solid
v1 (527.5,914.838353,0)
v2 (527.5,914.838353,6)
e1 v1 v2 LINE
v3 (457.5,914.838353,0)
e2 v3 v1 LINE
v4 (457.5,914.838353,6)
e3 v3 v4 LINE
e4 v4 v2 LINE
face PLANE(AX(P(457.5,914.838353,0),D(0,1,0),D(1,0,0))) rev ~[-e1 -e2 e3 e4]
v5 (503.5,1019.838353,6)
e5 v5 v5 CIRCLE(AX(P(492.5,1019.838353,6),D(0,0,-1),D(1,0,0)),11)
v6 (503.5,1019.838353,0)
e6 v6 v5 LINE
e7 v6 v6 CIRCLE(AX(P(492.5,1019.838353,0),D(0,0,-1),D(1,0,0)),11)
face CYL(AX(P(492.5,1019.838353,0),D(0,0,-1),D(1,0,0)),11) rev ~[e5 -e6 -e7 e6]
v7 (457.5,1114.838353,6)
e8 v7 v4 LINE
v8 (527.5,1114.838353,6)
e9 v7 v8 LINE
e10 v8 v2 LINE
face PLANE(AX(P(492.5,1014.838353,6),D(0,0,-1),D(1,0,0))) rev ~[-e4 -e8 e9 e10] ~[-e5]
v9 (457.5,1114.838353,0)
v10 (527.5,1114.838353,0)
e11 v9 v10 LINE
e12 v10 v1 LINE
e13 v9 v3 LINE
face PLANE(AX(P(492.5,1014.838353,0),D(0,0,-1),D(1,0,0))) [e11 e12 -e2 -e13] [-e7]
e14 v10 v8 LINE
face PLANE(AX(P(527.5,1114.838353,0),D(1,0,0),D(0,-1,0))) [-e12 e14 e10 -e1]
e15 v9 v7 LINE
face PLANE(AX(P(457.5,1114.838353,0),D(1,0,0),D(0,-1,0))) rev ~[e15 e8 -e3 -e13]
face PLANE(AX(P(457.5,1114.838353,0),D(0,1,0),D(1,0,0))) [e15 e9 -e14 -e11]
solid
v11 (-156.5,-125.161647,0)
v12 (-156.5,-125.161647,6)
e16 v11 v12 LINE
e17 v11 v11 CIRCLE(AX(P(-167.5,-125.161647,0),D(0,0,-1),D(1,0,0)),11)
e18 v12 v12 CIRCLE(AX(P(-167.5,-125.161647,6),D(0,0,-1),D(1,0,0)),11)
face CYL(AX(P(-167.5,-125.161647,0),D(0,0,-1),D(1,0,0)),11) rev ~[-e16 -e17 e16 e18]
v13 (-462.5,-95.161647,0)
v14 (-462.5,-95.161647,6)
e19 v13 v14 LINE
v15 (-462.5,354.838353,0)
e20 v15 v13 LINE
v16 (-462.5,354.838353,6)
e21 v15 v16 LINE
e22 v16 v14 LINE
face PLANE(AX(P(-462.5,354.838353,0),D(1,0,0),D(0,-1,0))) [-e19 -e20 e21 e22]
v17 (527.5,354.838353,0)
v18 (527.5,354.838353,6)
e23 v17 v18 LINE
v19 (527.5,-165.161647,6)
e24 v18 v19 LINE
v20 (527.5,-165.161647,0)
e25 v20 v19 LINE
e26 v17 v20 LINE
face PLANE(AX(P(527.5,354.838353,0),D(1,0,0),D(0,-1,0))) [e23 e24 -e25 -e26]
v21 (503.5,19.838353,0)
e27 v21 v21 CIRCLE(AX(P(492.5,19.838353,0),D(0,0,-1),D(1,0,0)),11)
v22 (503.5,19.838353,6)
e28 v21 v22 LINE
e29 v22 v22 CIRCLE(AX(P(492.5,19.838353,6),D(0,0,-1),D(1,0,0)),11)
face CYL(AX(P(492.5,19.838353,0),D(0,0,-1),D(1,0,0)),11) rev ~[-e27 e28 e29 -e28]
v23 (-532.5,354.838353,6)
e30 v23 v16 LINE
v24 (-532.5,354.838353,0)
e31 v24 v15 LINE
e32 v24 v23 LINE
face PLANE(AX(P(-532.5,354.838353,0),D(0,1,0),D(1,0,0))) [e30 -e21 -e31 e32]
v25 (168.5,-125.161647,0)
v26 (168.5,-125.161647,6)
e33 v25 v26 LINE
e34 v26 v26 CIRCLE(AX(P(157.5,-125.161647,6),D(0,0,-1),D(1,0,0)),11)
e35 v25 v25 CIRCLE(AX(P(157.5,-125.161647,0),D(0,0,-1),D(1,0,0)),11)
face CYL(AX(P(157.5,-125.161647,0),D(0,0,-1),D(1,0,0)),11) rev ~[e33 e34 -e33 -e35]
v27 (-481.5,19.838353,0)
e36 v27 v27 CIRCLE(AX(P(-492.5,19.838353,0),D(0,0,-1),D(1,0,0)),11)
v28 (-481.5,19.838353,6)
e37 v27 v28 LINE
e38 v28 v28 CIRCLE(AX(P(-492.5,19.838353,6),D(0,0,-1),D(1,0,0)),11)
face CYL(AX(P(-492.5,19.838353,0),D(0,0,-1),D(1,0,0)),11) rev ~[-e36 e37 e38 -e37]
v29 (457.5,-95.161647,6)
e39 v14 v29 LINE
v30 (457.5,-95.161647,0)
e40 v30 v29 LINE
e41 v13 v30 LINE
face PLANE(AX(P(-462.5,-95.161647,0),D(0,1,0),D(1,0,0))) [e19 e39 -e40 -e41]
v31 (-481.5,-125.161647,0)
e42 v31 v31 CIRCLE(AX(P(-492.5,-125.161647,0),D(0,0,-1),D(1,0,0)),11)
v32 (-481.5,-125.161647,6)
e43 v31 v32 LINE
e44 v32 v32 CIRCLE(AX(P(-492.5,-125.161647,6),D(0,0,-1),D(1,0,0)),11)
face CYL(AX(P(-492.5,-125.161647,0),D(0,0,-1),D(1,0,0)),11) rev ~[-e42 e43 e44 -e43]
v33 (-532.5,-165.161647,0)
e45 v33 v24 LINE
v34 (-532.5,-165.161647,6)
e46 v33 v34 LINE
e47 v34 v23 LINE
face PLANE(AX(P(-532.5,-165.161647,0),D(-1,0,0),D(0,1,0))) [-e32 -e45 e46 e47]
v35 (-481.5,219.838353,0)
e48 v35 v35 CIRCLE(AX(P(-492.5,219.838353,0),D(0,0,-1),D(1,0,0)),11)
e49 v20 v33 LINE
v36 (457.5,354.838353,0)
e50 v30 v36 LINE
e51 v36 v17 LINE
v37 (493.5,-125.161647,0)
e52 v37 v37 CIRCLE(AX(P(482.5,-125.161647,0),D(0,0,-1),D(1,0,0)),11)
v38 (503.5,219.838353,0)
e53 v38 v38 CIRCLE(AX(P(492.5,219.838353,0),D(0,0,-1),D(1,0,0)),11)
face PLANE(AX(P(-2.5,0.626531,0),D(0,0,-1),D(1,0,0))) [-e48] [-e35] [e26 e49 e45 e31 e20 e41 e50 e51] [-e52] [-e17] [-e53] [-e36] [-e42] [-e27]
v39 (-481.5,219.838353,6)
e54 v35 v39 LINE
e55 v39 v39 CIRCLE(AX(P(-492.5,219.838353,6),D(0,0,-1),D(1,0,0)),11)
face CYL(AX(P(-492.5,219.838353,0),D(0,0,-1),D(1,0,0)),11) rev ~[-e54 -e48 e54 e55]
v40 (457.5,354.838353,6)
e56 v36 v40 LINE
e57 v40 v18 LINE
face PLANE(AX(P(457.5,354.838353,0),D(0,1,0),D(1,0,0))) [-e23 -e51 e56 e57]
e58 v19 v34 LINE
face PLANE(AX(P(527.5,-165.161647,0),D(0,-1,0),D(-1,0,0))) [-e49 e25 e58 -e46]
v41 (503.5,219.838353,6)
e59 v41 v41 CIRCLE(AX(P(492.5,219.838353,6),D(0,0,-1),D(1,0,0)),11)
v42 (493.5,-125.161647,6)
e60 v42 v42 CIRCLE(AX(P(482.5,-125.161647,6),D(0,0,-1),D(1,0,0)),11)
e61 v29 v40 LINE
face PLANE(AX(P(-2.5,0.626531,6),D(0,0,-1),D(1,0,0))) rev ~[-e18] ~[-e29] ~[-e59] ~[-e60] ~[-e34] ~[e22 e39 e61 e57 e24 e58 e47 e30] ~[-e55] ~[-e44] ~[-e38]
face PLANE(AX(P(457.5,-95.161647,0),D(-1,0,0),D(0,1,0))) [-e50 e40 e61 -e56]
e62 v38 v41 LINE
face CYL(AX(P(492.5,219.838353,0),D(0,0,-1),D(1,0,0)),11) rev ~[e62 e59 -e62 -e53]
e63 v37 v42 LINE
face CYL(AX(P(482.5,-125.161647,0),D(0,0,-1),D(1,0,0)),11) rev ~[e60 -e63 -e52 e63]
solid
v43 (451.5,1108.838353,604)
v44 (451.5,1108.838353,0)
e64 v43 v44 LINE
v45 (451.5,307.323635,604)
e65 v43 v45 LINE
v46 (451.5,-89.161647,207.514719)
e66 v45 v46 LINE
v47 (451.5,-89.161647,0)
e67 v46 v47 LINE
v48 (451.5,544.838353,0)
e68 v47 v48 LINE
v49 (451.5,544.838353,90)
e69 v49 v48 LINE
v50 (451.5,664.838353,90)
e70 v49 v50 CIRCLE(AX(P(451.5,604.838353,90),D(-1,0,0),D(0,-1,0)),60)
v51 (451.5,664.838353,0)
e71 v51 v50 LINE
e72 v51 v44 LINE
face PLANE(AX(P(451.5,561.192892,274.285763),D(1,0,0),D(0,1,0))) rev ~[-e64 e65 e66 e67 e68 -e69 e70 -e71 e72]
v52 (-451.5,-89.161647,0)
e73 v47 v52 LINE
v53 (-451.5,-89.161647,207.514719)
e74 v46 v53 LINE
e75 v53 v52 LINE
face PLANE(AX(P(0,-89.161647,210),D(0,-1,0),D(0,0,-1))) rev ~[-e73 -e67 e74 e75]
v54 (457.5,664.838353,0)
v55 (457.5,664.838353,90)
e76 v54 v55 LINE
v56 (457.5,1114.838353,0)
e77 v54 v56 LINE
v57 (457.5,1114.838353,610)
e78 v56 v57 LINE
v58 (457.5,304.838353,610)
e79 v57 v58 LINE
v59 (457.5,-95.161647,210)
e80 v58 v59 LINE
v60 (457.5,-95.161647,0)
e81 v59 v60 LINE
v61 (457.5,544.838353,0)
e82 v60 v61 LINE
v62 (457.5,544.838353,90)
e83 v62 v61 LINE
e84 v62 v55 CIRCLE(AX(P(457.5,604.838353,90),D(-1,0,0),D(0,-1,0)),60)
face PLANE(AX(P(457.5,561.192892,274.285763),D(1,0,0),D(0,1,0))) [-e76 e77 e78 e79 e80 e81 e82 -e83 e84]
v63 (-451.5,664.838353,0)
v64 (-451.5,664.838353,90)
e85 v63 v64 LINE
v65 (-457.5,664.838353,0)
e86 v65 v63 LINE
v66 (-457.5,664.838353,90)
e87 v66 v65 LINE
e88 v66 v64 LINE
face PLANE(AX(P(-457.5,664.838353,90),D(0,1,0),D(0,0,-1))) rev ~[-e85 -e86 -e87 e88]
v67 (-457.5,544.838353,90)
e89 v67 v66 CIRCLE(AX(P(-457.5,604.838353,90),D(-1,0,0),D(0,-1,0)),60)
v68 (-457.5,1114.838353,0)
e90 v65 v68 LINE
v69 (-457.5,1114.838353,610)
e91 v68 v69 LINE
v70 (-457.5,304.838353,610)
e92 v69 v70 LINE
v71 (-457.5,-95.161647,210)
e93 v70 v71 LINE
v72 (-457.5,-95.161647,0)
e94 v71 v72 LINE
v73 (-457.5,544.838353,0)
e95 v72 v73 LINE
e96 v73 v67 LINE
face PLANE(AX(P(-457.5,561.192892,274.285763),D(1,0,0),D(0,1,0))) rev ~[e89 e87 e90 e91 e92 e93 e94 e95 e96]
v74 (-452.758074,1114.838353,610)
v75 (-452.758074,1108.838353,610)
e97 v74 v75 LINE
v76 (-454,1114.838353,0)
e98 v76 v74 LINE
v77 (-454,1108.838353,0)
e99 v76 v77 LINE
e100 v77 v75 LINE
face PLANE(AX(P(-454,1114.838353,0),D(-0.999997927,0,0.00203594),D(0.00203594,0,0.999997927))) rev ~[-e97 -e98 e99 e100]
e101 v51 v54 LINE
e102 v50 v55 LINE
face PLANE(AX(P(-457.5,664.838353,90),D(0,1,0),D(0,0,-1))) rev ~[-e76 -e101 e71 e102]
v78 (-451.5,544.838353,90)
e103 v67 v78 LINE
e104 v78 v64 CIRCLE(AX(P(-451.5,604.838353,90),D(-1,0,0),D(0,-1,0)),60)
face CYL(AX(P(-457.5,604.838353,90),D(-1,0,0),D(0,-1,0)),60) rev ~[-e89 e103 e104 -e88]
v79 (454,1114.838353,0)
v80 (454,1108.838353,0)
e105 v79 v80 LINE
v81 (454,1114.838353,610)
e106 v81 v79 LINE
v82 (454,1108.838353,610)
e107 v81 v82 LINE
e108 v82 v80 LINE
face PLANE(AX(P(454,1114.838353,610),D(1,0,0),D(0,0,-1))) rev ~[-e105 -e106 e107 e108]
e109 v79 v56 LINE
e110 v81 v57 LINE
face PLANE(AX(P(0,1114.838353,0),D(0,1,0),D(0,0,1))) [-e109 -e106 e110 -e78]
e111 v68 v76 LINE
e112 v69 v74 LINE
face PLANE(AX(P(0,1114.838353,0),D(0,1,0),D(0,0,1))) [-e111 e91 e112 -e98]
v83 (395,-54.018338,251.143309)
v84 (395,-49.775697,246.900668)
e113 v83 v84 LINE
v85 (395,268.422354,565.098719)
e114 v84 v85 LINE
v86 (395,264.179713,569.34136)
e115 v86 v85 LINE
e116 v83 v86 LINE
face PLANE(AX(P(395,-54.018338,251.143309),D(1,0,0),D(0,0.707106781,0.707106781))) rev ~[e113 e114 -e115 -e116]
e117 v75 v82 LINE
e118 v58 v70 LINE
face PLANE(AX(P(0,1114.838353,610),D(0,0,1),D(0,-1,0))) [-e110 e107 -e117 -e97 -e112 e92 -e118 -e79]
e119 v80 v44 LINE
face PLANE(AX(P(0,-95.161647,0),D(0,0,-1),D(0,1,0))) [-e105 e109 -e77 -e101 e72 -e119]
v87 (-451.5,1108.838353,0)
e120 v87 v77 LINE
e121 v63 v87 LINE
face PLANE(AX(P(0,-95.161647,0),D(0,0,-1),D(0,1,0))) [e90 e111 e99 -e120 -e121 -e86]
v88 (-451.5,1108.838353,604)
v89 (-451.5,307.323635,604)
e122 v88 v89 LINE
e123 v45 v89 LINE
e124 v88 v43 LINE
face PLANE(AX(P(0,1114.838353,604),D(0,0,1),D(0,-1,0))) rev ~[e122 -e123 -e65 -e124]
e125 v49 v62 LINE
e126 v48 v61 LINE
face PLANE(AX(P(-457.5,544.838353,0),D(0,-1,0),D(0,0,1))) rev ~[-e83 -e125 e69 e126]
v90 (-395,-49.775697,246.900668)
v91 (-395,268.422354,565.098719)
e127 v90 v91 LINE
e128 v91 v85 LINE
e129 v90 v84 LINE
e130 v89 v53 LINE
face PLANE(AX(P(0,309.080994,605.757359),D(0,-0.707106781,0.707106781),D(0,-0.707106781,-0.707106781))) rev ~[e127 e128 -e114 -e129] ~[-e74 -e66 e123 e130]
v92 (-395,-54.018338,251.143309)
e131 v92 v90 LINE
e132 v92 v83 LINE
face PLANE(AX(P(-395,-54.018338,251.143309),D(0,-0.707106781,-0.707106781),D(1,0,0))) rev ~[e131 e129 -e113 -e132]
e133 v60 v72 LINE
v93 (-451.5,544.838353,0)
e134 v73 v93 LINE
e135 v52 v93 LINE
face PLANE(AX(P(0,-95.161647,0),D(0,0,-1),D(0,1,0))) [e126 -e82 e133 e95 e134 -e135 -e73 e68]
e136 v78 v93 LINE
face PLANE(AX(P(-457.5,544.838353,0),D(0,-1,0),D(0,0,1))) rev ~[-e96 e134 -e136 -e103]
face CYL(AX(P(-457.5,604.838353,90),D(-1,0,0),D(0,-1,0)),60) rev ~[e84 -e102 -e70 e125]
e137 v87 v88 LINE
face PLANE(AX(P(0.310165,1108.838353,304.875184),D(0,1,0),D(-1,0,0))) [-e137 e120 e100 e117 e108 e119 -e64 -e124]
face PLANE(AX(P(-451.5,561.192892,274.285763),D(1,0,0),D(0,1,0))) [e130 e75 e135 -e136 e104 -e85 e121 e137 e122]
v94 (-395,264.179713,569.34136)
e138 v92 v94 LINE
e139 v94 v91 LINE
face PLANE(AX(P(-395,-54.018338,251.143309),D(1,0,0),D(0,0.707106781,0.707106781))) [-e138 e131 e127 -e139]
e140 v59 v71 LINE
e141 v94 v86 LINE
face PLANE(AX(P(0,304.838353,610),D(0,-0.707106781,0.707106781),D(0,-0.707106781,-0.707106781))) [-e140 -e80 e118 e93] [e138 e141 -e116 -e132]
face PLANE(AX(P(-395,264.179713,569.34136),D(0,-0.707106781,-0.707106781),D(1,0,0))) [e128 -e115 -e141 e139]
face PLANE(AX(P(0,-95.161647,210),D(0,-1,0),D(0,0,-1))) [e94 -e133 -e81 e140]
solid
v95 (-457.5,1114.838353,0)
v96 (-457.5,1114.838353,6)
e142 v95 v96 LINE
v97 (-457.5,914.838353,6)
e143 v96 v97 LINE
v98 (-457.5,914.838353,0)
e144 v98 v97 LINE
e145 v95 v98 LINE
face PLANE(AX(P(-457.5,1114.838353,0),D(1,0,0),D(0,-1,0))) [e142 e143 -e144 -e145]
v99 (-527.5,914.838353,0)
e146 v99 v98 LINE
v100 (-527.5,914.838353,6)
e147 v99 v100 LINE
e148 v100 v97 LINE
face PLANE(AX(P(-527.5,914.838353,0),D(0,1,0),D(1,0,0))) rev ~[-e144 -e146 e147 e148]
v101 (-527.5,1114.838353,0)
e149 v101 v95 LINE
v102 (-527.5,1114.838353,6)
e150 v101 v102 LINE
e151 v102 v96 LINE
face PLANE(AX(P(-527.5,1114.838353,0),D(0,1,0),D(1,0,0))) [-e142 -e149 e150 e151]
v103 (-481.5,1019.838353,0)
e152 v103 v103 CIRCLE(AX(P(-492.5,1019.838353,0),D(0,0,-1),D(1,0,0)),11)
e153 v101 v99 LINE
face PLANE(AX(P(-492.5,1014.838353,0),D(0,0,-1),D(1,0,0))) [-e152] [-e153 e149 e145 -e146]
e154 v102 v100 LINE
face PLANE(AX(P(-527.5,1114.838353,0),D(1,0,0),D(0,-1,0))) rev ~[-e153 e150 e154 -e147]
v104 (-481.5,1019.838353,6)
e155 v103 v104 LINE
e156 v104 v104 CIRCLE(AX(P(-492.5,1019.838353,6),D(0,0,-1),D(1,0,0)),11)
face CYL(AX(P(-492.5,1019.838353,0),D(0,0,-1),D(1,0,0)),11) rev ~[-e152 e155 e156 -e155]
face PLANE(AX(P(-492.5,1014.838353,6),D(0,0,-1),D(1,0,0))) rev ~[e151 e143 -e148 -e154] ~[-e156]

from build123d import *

# Parameters (mm, degrees)
F1_DEPTH  = 457.5
F2_T      = -6
F4_DEPTH  = 6
F5_R      = 11
F6_DEPTH  = 6
F5_W      = 70
F5_H      = 200
F8_DEPTH  = 985.001
F9_W      = 790
F9_H      = 450
F10_DEPTH = 6


with BuildPart() as f1:
    # F0 (on Right) → F1 (new body, symmetric)
    with BuildSketch(Plane.YZ):
        Polygon((-95.1616466045, 0), (1114.8383533955, 0), (1114.8383533955, 610), (304.8383533955, 610), (-95.1616466045, 210), align=None)
    extrude(amount=F1_DEPTH, both=True)

    # F2
    f2_openings = [f1.faces().sort_by_distance(p)[0] for p in [
        (0, 509.838353, 0),
    ]]
    offset(amount=F2_T, openings=f2_openings)

    # F3 (on face) → F4 (cut)
    with BuildSketch(Plane(origin=(0, 1114.8383533955, 0), x_dir=(-1, 0, 0), z_dir=(0, 1, 0))):
        Polygon((454, 0), (452.7580738068, 610), (-454, 610), (-454, 0), align=None)
    extrude(amount=-F4_DEPTH, mode=Mode.SUBTRACT)

    # F7 (on face) → F8 (cut, through all)
    with BuildSketch(Plane(origin=(-457.5, 0, 0), x_dir=(0, -1, 0), z_dir=(-1, 0, 0))):
        with BuildLine():
            Line((-664.8383533955, 90), (-664.8383533955, 0))
            Line((-664.8383533955, 0), (-544.8383533955, 0))
            Line((-544.8383533955, 0), (-544.8383533955, 90))
            ThreePointArc((-544.8383533955, 90), (-604.8383533955, 150), (-664.8383533955, 90))
        make_face()
    extrude(amount=-F8_DEPTH, mode=Mode.SUBTRACT)

    # F9 (on face) → F10 (cut)
    with BuildSketch(Plane(origin=(0, -152.5808233023, 152.5808233023), x_dir=(1, 0, 0), z_dir=(0, -0.7071067812, 0.7071067812))):
        with Locations((0, 364.3884033755)):
            Rectangle(F9_W, F9_H)
    extrude(amount=-F10_DEPTH, mode=Mode.SUBTRACT)


with BuildPart() as f6:
    # F5 (on face) → F6 (new body)
    with BuildSketch(Plane(origin=(0, 0, 0), x_dir=(1, 0, 0), z_dir=(0, 0, -1))):
        Polygon((-532.5, -354.8383533955), (-462.5, -354.8383533955), (-462.5, 95.1616466045), (457.5, 95.1616466045), (457.5, -354.8383533955), (527.5, -354.8383533955), (527.5, 165.1616466045), (-532.5, 165.1616466045), align=None)
        with Locations((-492.5, -219.8383533955)):
            Circle(F5_R, mode=Mode.SUBTRACT)
        with Locations((-492.5, -19.8383533955)):
            Circle(F5_R, mode=Mode.SUBTRACT)
        with Locations((-492.5, 125.1616466045)):
            Circle(F5_R, mode=Mode.SUBTRACT)
        with Locations((-167.5, 125.1616466045)):
            Circle(F5_R, mode=Mode.SUBTRACT)
        with Locations((492.5, -219.8383533955)):
            Circle(F5_R, mode=Mode.SUBTRACT)
        with Locations((157.5, 125.1616466045)):
            Circle(F5_R, mode=Mode.SUBTRACT)
        with Locations((492.5, -19.8383533955)):
            Circle(F5_R, mode=Mode.SUBTRACT)
        with Locations((482.5, 125.1616466045)):
            Circle(F5_R, mode=Mode.SUBTRACT)
    extrude(amount=-F6_DEPTH)


with BuildPart() as f6b:
    # F5 (on face) → F6, piece 2 (new body)
    with BuildSketch(Plane(origin=(0, 0, 0), x_dir=(1, 0, 0), z_dir=(0, 0, -1))):
        with Locations((-492.5, -1014.8383533955)):
            Rectangle(F5_W, F5_H)
        with Locations((-492.5, -1019.8383533955)):
            Circle(F5_R, mode=Mode.SUBTRACT)
    extrude(amount=-F6_DEPTH)


with BuildPart() as f6c:
    # F5 (on face) → F6, piece 3 (new body)
    with BuildSketch(Plane(origin=(0, 0, 0), x_dir=(1, 0, 0), z_dir=(0, 0, -1))):
        with Locations((492.5, -1014.8383533955)):
            Rectangle(F5_W, F5_H)
        with Locations((492.5, -1019.8383533955)):
            Circle(F5_R, mode=Mode.SUBTRACT)
    extrude(amount=-F6_DEPTH)


solid = Compound([f1.part, f6.part, f6b.part, f6c.part])
